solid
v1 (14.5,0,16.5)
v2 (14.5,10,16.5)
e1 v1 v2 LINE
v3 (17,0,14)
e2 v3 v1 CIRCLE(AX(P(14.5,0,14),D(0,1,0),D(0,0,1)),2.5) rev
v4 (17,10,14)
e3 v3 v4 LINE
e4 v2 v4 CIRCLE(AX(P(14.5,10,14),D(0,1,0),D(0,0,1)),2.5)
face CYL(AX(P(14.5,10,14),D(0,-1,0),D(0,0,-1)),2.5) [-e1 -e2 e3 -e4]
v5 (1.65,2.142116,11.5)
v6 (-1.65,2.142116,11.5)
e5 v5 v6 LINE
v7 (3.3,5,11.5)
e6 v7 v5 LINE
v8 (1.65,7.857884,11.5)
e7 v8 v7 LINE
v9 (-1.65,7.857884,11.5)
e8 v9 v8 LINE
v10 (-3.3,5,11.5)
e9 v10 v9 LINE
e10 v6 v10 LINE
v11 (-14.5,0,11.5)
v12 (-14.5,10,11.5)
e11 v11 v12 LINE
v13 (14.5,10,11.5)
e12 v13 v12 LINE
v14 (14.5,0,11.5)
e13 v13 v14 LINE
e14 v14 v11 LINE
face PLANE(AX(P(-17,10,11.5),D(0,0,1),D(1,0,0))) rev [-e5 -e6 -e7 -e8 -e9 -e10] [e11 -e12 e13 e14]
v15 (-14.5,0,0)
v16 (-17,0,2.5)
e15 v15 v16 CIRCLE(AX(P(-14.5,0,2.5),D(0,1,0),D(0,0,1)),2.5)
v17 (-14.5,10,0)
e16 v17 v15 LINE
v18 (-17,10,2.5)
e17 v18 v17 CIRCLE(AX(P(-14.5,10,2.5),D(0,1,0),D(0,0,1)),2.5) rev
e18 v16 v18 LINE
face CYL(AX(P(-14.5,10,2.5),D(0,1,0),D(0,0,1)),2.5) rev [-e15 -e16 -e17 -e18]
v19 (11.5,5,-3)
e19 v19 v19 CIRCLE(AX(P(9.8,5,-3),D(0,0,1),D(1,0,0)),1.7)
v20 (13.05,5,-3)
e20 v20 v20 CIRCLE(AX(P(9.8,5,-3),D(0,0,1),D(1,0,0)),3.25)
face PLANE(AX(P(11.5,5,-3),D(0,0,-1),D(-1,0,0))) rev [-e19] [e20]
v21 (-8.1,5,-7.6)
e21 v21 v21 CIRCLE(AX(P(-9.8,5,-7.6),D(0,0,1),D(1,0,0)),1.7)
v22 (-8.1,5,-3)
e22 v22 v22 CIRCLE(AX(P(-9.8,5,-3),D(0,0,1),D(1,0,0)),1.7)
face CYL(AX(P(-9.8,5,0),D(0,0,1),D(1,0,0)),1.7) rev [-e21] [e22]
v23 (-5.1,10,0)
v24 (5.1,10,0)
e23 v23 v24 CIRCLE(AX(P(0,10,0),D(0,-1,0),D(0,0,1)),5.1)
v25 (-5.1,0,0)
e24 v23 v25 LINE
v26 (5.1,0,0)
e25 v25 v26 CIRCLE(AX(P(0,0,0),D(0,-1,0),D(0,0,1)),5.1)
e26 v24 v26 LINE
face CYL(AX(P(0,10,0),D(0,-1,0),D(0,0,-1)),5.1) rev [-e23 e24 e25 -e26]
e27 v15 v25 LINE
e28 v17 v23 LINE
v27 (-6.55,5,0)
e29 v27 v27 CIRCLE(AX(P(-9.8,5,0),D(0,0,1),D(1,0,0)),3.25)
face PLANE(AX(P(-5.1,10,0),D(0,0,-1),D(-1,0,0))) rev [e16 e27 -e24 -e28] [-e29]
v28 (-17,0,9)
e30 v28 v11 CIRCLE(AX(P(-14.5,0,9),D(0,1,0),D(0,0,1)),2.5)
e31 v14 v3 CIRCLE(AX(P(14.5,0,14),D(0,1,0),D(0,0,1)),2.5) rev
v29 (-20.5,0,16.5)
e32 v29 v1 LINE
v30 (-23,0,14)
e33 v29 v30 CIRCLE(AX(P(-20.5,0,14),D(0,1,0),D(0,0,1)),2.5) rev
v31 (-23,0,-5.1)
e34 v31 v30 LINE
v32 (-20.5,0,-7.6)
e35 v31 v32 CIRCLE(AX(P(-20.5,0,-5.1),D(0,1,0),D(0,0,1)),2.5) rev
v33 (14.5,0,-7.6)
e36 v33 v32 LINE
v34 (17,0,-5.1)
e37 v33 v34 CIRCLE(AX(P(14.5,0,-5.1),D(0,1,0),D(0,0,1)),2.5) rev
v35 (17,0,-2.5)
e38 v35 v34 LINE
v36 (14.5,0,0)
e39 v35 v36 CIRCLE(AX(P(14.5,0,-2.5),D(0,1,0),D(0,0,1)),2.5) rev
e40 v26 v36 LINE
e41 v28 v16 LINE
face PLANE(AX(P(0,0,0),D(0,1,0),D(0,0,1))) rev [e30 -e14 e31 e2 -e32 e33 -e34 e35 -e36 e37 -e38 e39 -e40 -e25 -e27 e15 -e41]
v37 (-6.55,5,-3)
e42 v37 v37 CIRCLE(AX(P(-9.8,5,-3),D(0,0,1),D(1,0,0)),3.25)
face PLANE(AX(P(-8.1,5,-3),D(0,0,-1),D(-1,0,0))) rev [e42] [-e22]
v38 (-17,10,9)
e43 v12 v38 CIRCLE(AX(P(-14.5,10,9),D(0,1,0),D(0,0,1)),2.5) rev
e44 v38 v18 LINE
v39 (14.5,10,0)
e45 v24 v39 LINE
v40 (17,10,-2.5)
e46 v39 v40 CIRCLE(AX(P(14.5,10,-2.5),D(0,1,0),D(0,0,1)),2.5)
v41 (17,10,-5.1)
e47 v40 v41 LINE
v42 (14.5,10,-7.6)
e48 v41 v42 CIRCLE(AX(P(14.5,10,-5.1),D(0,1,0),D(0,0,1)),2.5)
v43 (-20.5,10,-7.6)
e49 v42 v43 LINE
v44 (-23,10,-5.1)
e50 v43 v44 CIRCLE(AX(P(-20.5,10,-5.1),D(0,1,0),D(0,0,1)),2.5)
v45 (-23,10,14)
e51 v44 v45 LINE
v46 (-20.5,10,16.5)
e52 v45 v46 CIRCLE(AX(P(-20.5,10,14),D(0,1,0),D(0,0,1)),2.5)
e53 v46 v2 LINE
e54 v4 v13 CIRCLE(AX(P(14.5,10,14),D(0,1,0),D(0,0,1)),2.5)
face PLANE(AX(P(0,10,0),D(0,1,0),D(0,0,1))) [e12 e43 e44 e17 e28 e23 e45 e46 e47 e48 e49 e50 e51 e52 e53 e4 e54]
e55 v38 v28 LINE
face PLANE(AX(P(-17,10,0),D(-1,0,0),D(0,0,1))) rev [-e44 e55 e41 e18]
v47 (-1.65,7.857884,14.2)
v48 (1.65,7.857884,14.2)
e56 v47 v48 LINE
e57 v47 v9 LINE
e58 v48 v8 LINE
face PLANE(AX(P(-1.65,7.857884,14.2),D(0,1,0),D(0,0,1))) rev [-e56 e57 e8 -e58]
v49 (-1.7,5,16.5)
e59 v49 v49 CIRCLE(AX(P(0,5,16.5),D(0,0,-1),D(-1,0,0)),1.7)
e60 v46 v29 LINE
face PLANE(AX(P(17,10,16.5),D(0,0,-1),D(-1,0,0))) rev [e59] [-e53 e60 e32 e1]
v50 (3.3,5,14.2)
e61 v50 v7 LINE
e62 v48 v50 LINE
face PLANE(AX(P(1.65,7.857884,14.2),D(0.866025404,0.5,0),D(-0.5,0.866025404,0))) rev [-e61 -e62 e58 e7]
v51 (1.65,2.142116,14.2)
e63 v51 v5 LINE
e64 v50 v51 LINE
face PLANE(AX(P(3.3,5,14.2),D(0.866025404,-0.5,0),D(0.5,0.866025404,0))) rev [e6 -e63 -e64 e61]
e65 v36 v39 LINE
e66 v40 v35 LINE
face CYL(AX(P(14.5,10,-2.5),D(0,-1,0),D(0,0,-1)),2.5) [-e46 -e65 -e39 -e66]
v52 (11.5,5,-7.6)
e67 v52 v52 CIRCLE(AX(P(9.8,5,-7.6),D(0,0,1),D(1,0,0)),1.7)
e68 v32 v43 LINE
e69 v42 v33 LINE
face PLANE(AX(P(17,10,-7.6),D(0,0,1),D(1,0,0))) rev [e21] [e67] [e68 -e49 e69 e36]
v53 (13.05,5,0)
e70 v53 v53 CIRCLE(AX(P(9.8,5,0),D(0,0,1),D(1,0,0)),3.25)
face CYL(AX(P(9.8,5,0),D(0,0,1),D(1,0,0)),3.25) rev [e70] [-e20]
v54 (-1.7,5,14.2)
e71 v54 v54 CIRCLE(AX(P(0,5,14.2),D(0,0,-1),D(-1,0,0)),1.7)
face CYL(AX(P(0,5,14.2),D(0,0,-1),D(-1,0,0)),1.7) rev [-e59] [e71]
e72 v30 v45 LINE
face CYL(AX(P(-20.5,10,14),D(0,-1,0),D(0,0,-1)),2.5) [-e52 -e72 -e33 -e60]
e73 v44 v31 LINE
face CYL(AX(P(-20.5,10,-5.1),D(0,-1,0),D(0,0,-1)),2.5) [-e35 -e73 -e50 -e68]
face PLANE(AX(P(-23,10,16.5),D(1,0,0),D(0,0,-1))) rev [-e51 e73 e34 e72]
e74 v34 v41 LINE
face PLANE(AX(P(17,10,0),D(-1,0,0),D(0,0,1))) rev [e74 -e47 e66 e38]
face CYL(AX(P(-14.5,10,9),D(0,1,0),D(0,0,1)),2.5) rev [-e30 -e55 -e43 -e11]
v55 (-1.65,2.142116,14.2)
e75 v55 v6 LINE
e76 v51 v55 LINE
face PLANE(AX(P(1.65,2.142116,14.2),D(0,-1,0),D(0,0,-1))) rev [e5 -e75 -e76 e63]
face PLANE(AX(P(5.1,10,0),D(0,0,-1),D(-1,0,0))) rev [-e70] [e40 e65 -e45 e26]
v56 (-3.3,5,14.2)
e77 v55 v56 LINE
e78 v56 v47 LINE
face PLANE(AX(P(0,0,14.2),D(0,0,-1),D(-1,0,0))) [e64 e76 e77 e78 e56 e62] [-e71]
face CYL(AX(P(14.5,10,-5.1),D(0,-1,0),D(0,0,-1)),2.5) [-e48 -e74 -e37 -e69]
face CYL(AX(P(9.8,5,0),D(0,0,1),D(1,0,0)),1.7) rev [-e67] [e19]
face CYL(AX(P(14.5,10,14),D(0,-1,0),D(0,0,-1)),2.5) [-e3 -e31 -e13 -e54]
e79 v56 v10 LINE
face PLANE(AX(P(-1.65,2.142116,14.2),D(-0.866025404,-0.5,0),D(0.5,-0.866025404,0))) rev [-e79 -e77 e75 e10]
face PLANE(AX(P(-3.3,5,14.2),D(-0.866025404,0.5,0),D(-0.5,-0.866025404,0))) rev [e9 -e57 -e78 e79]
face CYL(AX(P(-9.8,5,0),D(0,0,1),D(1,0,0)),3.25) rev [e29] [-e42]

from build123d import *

# Parameters (mm, degrees)
BOSS_EXTRUDE1_DEPTH            = 10
FILLET1_R                      = 2.5
CUT_EXTRUDE1_DEPTH             = 2.7
CBORE_FOR_M3_SHCS1_D           = 3.4
CBORE_FOR_M3_SHCS1_DEPTH       = 7.6
CBORE_FOR_M3_SHCS1_CBORE_D     = 6.5
CBORE_FOR_M3_SHCS1_CBORE_DEPTH = 3
M3_CLEARANCE_HOLE1_D           = 3.4
M3_CLEARANCE_HOLE1_DEPTH       = 2.3


with BuildPart() as part:
    # Sketch1 → Boss-Extrude1 (new body)
    with BuildSketch(Plane(origin=(0, 0, 0), x_dir=(1, 0, 0), z_dir=(0, 1, 0))):
        with BuildLine():
            Line((5.1, 0), (17, 0))
            Line((17, 0), (17, 7.6))
            Line((17, 7.6), (-23, 7.6))
            Line((-23, 7.6), (-23, -16.5))
            Line((-23, -16.5), (17, -16.5))
            Line((17, -16.5), (17, -11.5))
            Line((17, -11.5), (-17, -11.5))
            Line((-17, -11.5), (-17, 0))
            Line((-17, 0), (-5.1, 0))
            ThreePointArc((-5.1, 0), (0, 5.1), (5.1, 0))
        make_face()
    extrude(amount=BOSS_EXTRUDE1_DEPTH)

    # Fillet1
    fillet1_edges = [part.edges().sort_by_distance(p)[0] for p in [
        (-17, 5, 0),
        (-17, 5, 11.5),
        (17, 5, 11.5),
        (17, 5, 16.5),
        (-23, 5, 16.5),
        (-23, 5, -7.6),
        (17, 5, -7.6),
        (17, 5, 0),
    ]]
    fillet(fillet1_edges, radius=FILLET1_R - 0.0001)  # a hair under: the kernel refuses the full size

    # Sketch3 → Cut-Extrude1 (cut)
    with BuildSketch(Plane(origin=(0, 0, 11.5), x_dir=(-1, 0, 0), z_dir=(0, 0, -1))):
        Polygon((3.3, 5), (1.65, 7.857883832), (-1.65, 7.857883832), (-3.3, 5), (-1.65, 2.142116168), (1.65, 2.142116168), align=None)
    extrude(amount=-CUT_EXTRUDE1_DEPTH, mode=Mode.SUBTRACT)

    # CBORE for M3 SHCS1
    with Locations(Plane.XY):
        with Locations((-9.8, 5), (9.8, 5)):
            CounterBoreHole(CBORE_FOR_M3_SHCS1_D / 2, CBORE_FOR_M3_SHCS1_CBORE_D / 2, CBORE_FOR_M3_SHCS1_CBORE_DEPTH, depth=CBORE_FOR_M3_SHCS1_DEPTH)

    # M3 Clearance Hole1
    with Locations(Plane(origin=(0, 0, 14.2), x_dir=(-1, 0, 0), z_dir=(0, 0, -1))):
        with Locations((0, 5)):
            Hole(M3_CLEARANCE_HOLE1_D / 2, depth=M3_CLEARANCE_HOLE1_DEPTH)


solid = part.part
